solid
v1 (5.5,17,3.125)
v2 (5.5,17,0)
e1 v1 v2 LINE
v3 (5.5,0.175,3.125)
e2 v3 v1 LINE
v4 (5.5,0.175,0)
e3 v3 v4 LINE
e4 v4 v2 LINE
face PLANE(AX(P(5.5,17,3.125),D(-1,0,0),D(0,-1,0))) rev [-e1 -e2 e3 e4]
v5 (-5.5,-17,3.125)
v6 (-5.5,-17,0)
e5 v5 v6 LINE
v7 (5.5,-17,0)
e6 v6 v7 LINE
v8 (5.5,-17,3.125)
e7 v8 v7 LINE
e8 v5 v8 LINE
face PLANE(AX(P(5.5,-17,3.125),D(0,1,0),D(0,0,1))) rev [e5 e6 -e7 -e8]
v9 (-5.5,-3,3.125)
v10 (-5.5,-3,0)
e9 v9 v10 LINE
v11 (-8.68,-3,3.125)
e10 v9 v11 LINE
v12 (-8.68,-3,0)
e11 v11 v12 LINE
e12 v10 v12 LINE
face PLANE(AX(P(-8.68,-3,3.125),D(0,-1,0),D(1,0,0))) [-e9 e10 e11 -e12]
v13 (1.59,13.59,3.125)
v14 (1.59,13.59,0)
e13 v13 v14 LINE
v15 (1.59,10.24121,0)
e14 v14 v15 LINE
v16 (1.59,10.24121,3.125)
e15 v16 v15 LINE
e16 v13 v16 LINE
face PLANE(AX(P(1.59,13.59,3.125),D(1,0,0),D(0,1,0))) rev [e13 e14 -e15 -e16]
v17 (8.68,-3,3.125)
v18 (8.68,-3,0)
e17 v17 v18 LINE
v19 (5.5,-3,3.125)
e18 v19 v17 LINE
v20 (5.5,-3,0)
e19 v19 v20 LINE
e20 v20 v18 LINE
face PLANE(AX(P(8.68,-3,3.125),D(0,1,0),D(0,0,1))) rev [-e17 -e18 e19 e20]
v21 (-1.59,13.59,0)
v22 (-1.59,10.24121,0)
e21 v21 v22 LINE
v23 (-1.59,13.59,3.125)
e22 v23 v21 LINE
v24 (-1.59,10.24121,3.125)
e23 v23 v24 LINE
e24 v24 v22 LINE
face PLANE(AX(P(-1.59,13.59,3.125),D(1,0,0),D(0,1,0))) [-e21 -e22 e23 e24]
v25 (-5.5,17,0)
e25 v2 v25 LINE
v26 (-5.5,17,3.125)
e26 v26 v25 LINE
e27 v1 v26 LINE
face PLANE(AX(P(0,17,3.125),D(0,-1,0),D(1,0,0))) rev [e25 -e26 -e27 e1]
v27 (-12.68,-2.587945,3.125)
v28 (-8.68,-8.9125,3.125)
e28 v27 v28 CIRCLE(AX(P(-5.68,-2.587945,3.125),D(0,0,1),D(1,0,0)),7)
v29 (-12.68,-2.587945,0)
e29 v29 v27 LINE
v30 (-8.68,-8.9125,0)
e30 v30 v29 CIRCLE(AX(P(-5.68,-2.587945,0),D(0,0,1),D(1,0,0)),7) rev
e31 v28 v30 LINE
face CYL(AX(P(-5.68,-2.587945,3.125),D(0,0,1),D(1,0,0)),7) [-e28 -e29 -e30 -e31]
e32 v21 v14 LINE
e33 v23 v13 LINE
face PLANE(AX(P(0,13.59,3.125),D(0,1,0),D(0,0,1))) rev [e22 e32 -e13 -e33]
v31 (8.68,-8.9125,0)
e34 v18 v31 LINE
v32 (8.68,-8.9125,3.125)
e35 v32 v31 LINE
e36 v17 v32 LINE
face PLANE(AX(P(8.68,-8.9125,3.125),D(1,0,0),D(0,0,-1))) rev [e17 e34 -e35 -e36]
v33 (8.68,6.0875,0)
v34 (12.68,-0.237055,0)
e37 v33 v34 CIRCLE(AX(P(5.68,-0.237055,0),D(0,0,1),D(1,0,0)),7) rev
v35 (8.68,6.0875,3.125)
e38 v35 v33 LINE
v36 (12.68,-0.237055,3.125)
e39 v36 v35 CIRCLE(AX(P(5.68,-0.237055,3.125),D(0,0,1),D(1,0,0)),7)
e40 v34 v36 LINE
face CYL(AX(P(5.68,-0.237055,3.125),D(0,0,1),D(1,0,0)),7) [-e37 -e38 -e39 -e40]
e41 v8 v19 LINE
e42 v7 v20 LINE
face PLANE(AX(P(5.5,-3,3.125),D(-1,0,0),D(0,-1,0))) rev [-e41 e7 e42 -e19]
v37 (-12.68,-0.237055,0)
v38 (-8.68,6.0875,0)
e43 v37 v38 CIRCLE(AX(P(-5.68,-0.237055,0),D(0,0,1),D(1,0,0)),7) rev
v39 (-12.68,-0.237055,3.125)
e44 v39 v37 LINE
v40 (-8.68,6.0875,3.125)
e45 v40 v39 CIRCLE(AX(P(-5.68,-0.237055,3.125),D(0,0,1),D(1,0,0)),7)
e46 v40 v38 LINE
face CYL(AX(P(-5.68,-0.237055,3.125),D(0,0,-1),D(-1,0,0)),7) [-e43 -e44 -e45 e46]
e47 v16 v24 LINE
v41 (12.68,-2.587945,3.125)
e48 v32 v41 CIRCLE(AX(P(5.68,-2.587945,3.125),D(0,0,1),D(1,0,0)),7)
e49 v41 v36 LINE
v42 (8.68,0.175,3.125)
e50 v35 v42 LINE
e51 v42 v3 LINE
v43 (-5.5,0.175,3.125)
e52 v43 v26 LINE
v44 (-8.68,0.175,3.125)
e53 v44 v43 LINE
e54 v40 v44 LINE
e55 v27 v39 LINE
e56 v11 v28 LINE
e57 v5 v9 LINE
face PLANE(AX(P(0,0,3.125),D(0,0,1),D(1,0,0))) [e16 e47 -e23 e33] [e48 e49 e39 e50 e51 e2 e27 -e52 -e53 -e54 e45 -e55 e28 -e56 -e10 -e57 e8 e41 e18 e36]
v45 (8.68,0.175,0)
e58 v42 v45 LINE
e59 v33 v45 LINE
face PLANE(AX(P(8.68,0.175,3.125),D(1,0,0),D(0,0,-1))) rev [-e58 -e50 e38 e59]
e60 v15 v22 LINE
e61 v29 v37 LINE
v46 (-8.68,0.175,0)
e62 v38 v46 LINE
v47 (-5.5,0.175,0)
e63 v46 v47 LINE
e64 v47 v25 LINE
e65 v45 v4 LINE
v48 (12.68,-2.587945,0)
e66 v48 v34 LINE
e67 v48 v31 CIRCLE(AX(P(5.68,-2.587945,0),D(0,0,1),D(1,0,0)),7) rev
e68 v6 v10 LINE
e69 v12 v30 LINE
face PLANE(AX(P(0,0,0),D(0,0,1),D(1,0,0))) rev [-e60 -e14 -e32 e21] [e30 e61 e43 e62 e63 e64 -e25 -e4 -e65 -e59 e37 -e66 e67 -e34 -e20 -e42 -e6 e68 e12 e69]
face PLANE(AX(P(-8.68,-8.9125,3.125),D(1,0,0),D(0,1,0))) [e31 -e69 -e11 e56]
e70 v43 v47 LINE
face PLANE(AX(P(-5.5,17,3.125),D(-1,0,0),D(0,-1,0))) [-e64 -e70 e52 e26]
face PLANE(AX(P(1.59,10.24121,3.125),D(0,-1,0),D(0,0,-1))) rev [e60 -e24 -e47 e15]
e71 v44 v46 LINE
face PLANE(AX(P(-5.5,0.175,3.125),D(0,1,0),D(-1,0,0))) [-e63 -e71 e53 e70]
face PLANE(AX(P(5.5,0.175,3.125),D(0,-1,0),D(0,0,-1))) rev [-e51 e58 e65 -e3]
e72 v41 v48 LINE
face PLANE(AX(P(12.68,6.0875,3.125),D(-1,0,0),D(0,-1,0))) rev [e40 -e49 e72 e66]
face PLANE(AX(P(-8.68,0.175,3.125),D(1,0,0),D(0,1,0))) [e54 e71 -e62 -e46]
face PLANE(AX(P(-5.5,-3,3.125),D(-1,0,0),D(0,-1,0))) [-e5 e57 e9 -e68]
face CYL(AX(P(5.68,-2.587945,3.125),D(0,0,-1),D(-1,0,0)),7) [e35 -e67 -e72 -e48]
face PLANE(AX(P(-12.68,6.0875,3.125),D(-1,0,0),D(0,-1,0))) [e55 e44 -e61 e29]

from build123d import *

# Parameters (mm, degrees)
BOSS_EXTRUDE1_DEPTH = 3.125
FILLET1_R           = 7


with BuildPart() as part:
    # Sketch2 → Boss-Extrude1 (new body)
    with BuildSketch(Plane.XY):
        Polygon((0, 17), (5.5, 17), (5.5, 0.175), (8.68, 0.175), (8.68, 6.0875), (12.68, 6.0875), (12.68, -8.9125), (8.68, -8.9125), (8.68, -3), (5.5, -3), (5.5, -17), (0, -17), (0, 10.241210398), (1.59, 10.241210398), (1.59, 13.59), (0, 13.59), align=None)
    boss_extrude1 = extrude(amount=BOSS_EXTRUDE1_DEPTH)

    # Mirror1: Boss-Extrude1 across plane
    add(boss_extrude1.mirror(Plane(origin=(0, 10.241210398, 3.125), x_dir=(0, 0, 1), z_dir=(1, 0, 0))))

    # Fillet1
    # the kernel refuses this fillet: 7 mm, written as the material it takes off along each edge
    with BuildSketch(Plane(origin=(-12.68, -8.9125, -15.811388301), x_dir=(0, 1, 0), z_dir=(0, 0, 1)), Plane(origin=(12.68, 6.0875, -15.811388301), x_dir=(0, -1, 0), z_dir=(0, 0, 1))) as fillet1_piece_1:
        with BuildLine():
            CenterArc((6.32455532, -7), FILLET1_R, 90, 64.623066475)
            Line((0, -4), (-0.126491106, -3.94))
            ThreePointArc((-0.126491106, -3.94), (-0.14, -2), (-0.14, 0))
            Line((-0.14, 0), (0, 0.14))
            Line((0, 0.14), (6.32455532, 0.14))
            Line((6.32455532, 0.14), (6.32455532, 0))
        make_face()
    extrude(amount=34.747776602, mode=Mode.SUBTRACT)
    with BuildSketch(Plane(origin=(-12.68, 6.0875, -15.811388301), x_dir=(1, 0, 0), z_dir=(0, 0, 1)), Plane(origin=(12.68, -8.9125, -15.811388301), x_dir=(-1, 0, 0), z_dir=(0, 0, 1))) as fillet1_piece_2:
        with BuildLine():
            CenterArc((7, -6.32455532), FILLET1_R, 115.376933525, 64.623066475)
            Line((0, -6.32455532), (-0.14, -6.32455532))
            Line((-0.14, -6.32455532), (-0.14, 0))
            Line((-0.14, 0), (0, 0.14))
            ThreePointArc((0, 0.14), (2, 0.14), (3.94, 0.126491106))
            Line((3.94, 0.126491106), (4, 0))
        make_face()
    extrude(amount=34.747776602, mode=Mode.SUBTRACT)


solid = part.part
